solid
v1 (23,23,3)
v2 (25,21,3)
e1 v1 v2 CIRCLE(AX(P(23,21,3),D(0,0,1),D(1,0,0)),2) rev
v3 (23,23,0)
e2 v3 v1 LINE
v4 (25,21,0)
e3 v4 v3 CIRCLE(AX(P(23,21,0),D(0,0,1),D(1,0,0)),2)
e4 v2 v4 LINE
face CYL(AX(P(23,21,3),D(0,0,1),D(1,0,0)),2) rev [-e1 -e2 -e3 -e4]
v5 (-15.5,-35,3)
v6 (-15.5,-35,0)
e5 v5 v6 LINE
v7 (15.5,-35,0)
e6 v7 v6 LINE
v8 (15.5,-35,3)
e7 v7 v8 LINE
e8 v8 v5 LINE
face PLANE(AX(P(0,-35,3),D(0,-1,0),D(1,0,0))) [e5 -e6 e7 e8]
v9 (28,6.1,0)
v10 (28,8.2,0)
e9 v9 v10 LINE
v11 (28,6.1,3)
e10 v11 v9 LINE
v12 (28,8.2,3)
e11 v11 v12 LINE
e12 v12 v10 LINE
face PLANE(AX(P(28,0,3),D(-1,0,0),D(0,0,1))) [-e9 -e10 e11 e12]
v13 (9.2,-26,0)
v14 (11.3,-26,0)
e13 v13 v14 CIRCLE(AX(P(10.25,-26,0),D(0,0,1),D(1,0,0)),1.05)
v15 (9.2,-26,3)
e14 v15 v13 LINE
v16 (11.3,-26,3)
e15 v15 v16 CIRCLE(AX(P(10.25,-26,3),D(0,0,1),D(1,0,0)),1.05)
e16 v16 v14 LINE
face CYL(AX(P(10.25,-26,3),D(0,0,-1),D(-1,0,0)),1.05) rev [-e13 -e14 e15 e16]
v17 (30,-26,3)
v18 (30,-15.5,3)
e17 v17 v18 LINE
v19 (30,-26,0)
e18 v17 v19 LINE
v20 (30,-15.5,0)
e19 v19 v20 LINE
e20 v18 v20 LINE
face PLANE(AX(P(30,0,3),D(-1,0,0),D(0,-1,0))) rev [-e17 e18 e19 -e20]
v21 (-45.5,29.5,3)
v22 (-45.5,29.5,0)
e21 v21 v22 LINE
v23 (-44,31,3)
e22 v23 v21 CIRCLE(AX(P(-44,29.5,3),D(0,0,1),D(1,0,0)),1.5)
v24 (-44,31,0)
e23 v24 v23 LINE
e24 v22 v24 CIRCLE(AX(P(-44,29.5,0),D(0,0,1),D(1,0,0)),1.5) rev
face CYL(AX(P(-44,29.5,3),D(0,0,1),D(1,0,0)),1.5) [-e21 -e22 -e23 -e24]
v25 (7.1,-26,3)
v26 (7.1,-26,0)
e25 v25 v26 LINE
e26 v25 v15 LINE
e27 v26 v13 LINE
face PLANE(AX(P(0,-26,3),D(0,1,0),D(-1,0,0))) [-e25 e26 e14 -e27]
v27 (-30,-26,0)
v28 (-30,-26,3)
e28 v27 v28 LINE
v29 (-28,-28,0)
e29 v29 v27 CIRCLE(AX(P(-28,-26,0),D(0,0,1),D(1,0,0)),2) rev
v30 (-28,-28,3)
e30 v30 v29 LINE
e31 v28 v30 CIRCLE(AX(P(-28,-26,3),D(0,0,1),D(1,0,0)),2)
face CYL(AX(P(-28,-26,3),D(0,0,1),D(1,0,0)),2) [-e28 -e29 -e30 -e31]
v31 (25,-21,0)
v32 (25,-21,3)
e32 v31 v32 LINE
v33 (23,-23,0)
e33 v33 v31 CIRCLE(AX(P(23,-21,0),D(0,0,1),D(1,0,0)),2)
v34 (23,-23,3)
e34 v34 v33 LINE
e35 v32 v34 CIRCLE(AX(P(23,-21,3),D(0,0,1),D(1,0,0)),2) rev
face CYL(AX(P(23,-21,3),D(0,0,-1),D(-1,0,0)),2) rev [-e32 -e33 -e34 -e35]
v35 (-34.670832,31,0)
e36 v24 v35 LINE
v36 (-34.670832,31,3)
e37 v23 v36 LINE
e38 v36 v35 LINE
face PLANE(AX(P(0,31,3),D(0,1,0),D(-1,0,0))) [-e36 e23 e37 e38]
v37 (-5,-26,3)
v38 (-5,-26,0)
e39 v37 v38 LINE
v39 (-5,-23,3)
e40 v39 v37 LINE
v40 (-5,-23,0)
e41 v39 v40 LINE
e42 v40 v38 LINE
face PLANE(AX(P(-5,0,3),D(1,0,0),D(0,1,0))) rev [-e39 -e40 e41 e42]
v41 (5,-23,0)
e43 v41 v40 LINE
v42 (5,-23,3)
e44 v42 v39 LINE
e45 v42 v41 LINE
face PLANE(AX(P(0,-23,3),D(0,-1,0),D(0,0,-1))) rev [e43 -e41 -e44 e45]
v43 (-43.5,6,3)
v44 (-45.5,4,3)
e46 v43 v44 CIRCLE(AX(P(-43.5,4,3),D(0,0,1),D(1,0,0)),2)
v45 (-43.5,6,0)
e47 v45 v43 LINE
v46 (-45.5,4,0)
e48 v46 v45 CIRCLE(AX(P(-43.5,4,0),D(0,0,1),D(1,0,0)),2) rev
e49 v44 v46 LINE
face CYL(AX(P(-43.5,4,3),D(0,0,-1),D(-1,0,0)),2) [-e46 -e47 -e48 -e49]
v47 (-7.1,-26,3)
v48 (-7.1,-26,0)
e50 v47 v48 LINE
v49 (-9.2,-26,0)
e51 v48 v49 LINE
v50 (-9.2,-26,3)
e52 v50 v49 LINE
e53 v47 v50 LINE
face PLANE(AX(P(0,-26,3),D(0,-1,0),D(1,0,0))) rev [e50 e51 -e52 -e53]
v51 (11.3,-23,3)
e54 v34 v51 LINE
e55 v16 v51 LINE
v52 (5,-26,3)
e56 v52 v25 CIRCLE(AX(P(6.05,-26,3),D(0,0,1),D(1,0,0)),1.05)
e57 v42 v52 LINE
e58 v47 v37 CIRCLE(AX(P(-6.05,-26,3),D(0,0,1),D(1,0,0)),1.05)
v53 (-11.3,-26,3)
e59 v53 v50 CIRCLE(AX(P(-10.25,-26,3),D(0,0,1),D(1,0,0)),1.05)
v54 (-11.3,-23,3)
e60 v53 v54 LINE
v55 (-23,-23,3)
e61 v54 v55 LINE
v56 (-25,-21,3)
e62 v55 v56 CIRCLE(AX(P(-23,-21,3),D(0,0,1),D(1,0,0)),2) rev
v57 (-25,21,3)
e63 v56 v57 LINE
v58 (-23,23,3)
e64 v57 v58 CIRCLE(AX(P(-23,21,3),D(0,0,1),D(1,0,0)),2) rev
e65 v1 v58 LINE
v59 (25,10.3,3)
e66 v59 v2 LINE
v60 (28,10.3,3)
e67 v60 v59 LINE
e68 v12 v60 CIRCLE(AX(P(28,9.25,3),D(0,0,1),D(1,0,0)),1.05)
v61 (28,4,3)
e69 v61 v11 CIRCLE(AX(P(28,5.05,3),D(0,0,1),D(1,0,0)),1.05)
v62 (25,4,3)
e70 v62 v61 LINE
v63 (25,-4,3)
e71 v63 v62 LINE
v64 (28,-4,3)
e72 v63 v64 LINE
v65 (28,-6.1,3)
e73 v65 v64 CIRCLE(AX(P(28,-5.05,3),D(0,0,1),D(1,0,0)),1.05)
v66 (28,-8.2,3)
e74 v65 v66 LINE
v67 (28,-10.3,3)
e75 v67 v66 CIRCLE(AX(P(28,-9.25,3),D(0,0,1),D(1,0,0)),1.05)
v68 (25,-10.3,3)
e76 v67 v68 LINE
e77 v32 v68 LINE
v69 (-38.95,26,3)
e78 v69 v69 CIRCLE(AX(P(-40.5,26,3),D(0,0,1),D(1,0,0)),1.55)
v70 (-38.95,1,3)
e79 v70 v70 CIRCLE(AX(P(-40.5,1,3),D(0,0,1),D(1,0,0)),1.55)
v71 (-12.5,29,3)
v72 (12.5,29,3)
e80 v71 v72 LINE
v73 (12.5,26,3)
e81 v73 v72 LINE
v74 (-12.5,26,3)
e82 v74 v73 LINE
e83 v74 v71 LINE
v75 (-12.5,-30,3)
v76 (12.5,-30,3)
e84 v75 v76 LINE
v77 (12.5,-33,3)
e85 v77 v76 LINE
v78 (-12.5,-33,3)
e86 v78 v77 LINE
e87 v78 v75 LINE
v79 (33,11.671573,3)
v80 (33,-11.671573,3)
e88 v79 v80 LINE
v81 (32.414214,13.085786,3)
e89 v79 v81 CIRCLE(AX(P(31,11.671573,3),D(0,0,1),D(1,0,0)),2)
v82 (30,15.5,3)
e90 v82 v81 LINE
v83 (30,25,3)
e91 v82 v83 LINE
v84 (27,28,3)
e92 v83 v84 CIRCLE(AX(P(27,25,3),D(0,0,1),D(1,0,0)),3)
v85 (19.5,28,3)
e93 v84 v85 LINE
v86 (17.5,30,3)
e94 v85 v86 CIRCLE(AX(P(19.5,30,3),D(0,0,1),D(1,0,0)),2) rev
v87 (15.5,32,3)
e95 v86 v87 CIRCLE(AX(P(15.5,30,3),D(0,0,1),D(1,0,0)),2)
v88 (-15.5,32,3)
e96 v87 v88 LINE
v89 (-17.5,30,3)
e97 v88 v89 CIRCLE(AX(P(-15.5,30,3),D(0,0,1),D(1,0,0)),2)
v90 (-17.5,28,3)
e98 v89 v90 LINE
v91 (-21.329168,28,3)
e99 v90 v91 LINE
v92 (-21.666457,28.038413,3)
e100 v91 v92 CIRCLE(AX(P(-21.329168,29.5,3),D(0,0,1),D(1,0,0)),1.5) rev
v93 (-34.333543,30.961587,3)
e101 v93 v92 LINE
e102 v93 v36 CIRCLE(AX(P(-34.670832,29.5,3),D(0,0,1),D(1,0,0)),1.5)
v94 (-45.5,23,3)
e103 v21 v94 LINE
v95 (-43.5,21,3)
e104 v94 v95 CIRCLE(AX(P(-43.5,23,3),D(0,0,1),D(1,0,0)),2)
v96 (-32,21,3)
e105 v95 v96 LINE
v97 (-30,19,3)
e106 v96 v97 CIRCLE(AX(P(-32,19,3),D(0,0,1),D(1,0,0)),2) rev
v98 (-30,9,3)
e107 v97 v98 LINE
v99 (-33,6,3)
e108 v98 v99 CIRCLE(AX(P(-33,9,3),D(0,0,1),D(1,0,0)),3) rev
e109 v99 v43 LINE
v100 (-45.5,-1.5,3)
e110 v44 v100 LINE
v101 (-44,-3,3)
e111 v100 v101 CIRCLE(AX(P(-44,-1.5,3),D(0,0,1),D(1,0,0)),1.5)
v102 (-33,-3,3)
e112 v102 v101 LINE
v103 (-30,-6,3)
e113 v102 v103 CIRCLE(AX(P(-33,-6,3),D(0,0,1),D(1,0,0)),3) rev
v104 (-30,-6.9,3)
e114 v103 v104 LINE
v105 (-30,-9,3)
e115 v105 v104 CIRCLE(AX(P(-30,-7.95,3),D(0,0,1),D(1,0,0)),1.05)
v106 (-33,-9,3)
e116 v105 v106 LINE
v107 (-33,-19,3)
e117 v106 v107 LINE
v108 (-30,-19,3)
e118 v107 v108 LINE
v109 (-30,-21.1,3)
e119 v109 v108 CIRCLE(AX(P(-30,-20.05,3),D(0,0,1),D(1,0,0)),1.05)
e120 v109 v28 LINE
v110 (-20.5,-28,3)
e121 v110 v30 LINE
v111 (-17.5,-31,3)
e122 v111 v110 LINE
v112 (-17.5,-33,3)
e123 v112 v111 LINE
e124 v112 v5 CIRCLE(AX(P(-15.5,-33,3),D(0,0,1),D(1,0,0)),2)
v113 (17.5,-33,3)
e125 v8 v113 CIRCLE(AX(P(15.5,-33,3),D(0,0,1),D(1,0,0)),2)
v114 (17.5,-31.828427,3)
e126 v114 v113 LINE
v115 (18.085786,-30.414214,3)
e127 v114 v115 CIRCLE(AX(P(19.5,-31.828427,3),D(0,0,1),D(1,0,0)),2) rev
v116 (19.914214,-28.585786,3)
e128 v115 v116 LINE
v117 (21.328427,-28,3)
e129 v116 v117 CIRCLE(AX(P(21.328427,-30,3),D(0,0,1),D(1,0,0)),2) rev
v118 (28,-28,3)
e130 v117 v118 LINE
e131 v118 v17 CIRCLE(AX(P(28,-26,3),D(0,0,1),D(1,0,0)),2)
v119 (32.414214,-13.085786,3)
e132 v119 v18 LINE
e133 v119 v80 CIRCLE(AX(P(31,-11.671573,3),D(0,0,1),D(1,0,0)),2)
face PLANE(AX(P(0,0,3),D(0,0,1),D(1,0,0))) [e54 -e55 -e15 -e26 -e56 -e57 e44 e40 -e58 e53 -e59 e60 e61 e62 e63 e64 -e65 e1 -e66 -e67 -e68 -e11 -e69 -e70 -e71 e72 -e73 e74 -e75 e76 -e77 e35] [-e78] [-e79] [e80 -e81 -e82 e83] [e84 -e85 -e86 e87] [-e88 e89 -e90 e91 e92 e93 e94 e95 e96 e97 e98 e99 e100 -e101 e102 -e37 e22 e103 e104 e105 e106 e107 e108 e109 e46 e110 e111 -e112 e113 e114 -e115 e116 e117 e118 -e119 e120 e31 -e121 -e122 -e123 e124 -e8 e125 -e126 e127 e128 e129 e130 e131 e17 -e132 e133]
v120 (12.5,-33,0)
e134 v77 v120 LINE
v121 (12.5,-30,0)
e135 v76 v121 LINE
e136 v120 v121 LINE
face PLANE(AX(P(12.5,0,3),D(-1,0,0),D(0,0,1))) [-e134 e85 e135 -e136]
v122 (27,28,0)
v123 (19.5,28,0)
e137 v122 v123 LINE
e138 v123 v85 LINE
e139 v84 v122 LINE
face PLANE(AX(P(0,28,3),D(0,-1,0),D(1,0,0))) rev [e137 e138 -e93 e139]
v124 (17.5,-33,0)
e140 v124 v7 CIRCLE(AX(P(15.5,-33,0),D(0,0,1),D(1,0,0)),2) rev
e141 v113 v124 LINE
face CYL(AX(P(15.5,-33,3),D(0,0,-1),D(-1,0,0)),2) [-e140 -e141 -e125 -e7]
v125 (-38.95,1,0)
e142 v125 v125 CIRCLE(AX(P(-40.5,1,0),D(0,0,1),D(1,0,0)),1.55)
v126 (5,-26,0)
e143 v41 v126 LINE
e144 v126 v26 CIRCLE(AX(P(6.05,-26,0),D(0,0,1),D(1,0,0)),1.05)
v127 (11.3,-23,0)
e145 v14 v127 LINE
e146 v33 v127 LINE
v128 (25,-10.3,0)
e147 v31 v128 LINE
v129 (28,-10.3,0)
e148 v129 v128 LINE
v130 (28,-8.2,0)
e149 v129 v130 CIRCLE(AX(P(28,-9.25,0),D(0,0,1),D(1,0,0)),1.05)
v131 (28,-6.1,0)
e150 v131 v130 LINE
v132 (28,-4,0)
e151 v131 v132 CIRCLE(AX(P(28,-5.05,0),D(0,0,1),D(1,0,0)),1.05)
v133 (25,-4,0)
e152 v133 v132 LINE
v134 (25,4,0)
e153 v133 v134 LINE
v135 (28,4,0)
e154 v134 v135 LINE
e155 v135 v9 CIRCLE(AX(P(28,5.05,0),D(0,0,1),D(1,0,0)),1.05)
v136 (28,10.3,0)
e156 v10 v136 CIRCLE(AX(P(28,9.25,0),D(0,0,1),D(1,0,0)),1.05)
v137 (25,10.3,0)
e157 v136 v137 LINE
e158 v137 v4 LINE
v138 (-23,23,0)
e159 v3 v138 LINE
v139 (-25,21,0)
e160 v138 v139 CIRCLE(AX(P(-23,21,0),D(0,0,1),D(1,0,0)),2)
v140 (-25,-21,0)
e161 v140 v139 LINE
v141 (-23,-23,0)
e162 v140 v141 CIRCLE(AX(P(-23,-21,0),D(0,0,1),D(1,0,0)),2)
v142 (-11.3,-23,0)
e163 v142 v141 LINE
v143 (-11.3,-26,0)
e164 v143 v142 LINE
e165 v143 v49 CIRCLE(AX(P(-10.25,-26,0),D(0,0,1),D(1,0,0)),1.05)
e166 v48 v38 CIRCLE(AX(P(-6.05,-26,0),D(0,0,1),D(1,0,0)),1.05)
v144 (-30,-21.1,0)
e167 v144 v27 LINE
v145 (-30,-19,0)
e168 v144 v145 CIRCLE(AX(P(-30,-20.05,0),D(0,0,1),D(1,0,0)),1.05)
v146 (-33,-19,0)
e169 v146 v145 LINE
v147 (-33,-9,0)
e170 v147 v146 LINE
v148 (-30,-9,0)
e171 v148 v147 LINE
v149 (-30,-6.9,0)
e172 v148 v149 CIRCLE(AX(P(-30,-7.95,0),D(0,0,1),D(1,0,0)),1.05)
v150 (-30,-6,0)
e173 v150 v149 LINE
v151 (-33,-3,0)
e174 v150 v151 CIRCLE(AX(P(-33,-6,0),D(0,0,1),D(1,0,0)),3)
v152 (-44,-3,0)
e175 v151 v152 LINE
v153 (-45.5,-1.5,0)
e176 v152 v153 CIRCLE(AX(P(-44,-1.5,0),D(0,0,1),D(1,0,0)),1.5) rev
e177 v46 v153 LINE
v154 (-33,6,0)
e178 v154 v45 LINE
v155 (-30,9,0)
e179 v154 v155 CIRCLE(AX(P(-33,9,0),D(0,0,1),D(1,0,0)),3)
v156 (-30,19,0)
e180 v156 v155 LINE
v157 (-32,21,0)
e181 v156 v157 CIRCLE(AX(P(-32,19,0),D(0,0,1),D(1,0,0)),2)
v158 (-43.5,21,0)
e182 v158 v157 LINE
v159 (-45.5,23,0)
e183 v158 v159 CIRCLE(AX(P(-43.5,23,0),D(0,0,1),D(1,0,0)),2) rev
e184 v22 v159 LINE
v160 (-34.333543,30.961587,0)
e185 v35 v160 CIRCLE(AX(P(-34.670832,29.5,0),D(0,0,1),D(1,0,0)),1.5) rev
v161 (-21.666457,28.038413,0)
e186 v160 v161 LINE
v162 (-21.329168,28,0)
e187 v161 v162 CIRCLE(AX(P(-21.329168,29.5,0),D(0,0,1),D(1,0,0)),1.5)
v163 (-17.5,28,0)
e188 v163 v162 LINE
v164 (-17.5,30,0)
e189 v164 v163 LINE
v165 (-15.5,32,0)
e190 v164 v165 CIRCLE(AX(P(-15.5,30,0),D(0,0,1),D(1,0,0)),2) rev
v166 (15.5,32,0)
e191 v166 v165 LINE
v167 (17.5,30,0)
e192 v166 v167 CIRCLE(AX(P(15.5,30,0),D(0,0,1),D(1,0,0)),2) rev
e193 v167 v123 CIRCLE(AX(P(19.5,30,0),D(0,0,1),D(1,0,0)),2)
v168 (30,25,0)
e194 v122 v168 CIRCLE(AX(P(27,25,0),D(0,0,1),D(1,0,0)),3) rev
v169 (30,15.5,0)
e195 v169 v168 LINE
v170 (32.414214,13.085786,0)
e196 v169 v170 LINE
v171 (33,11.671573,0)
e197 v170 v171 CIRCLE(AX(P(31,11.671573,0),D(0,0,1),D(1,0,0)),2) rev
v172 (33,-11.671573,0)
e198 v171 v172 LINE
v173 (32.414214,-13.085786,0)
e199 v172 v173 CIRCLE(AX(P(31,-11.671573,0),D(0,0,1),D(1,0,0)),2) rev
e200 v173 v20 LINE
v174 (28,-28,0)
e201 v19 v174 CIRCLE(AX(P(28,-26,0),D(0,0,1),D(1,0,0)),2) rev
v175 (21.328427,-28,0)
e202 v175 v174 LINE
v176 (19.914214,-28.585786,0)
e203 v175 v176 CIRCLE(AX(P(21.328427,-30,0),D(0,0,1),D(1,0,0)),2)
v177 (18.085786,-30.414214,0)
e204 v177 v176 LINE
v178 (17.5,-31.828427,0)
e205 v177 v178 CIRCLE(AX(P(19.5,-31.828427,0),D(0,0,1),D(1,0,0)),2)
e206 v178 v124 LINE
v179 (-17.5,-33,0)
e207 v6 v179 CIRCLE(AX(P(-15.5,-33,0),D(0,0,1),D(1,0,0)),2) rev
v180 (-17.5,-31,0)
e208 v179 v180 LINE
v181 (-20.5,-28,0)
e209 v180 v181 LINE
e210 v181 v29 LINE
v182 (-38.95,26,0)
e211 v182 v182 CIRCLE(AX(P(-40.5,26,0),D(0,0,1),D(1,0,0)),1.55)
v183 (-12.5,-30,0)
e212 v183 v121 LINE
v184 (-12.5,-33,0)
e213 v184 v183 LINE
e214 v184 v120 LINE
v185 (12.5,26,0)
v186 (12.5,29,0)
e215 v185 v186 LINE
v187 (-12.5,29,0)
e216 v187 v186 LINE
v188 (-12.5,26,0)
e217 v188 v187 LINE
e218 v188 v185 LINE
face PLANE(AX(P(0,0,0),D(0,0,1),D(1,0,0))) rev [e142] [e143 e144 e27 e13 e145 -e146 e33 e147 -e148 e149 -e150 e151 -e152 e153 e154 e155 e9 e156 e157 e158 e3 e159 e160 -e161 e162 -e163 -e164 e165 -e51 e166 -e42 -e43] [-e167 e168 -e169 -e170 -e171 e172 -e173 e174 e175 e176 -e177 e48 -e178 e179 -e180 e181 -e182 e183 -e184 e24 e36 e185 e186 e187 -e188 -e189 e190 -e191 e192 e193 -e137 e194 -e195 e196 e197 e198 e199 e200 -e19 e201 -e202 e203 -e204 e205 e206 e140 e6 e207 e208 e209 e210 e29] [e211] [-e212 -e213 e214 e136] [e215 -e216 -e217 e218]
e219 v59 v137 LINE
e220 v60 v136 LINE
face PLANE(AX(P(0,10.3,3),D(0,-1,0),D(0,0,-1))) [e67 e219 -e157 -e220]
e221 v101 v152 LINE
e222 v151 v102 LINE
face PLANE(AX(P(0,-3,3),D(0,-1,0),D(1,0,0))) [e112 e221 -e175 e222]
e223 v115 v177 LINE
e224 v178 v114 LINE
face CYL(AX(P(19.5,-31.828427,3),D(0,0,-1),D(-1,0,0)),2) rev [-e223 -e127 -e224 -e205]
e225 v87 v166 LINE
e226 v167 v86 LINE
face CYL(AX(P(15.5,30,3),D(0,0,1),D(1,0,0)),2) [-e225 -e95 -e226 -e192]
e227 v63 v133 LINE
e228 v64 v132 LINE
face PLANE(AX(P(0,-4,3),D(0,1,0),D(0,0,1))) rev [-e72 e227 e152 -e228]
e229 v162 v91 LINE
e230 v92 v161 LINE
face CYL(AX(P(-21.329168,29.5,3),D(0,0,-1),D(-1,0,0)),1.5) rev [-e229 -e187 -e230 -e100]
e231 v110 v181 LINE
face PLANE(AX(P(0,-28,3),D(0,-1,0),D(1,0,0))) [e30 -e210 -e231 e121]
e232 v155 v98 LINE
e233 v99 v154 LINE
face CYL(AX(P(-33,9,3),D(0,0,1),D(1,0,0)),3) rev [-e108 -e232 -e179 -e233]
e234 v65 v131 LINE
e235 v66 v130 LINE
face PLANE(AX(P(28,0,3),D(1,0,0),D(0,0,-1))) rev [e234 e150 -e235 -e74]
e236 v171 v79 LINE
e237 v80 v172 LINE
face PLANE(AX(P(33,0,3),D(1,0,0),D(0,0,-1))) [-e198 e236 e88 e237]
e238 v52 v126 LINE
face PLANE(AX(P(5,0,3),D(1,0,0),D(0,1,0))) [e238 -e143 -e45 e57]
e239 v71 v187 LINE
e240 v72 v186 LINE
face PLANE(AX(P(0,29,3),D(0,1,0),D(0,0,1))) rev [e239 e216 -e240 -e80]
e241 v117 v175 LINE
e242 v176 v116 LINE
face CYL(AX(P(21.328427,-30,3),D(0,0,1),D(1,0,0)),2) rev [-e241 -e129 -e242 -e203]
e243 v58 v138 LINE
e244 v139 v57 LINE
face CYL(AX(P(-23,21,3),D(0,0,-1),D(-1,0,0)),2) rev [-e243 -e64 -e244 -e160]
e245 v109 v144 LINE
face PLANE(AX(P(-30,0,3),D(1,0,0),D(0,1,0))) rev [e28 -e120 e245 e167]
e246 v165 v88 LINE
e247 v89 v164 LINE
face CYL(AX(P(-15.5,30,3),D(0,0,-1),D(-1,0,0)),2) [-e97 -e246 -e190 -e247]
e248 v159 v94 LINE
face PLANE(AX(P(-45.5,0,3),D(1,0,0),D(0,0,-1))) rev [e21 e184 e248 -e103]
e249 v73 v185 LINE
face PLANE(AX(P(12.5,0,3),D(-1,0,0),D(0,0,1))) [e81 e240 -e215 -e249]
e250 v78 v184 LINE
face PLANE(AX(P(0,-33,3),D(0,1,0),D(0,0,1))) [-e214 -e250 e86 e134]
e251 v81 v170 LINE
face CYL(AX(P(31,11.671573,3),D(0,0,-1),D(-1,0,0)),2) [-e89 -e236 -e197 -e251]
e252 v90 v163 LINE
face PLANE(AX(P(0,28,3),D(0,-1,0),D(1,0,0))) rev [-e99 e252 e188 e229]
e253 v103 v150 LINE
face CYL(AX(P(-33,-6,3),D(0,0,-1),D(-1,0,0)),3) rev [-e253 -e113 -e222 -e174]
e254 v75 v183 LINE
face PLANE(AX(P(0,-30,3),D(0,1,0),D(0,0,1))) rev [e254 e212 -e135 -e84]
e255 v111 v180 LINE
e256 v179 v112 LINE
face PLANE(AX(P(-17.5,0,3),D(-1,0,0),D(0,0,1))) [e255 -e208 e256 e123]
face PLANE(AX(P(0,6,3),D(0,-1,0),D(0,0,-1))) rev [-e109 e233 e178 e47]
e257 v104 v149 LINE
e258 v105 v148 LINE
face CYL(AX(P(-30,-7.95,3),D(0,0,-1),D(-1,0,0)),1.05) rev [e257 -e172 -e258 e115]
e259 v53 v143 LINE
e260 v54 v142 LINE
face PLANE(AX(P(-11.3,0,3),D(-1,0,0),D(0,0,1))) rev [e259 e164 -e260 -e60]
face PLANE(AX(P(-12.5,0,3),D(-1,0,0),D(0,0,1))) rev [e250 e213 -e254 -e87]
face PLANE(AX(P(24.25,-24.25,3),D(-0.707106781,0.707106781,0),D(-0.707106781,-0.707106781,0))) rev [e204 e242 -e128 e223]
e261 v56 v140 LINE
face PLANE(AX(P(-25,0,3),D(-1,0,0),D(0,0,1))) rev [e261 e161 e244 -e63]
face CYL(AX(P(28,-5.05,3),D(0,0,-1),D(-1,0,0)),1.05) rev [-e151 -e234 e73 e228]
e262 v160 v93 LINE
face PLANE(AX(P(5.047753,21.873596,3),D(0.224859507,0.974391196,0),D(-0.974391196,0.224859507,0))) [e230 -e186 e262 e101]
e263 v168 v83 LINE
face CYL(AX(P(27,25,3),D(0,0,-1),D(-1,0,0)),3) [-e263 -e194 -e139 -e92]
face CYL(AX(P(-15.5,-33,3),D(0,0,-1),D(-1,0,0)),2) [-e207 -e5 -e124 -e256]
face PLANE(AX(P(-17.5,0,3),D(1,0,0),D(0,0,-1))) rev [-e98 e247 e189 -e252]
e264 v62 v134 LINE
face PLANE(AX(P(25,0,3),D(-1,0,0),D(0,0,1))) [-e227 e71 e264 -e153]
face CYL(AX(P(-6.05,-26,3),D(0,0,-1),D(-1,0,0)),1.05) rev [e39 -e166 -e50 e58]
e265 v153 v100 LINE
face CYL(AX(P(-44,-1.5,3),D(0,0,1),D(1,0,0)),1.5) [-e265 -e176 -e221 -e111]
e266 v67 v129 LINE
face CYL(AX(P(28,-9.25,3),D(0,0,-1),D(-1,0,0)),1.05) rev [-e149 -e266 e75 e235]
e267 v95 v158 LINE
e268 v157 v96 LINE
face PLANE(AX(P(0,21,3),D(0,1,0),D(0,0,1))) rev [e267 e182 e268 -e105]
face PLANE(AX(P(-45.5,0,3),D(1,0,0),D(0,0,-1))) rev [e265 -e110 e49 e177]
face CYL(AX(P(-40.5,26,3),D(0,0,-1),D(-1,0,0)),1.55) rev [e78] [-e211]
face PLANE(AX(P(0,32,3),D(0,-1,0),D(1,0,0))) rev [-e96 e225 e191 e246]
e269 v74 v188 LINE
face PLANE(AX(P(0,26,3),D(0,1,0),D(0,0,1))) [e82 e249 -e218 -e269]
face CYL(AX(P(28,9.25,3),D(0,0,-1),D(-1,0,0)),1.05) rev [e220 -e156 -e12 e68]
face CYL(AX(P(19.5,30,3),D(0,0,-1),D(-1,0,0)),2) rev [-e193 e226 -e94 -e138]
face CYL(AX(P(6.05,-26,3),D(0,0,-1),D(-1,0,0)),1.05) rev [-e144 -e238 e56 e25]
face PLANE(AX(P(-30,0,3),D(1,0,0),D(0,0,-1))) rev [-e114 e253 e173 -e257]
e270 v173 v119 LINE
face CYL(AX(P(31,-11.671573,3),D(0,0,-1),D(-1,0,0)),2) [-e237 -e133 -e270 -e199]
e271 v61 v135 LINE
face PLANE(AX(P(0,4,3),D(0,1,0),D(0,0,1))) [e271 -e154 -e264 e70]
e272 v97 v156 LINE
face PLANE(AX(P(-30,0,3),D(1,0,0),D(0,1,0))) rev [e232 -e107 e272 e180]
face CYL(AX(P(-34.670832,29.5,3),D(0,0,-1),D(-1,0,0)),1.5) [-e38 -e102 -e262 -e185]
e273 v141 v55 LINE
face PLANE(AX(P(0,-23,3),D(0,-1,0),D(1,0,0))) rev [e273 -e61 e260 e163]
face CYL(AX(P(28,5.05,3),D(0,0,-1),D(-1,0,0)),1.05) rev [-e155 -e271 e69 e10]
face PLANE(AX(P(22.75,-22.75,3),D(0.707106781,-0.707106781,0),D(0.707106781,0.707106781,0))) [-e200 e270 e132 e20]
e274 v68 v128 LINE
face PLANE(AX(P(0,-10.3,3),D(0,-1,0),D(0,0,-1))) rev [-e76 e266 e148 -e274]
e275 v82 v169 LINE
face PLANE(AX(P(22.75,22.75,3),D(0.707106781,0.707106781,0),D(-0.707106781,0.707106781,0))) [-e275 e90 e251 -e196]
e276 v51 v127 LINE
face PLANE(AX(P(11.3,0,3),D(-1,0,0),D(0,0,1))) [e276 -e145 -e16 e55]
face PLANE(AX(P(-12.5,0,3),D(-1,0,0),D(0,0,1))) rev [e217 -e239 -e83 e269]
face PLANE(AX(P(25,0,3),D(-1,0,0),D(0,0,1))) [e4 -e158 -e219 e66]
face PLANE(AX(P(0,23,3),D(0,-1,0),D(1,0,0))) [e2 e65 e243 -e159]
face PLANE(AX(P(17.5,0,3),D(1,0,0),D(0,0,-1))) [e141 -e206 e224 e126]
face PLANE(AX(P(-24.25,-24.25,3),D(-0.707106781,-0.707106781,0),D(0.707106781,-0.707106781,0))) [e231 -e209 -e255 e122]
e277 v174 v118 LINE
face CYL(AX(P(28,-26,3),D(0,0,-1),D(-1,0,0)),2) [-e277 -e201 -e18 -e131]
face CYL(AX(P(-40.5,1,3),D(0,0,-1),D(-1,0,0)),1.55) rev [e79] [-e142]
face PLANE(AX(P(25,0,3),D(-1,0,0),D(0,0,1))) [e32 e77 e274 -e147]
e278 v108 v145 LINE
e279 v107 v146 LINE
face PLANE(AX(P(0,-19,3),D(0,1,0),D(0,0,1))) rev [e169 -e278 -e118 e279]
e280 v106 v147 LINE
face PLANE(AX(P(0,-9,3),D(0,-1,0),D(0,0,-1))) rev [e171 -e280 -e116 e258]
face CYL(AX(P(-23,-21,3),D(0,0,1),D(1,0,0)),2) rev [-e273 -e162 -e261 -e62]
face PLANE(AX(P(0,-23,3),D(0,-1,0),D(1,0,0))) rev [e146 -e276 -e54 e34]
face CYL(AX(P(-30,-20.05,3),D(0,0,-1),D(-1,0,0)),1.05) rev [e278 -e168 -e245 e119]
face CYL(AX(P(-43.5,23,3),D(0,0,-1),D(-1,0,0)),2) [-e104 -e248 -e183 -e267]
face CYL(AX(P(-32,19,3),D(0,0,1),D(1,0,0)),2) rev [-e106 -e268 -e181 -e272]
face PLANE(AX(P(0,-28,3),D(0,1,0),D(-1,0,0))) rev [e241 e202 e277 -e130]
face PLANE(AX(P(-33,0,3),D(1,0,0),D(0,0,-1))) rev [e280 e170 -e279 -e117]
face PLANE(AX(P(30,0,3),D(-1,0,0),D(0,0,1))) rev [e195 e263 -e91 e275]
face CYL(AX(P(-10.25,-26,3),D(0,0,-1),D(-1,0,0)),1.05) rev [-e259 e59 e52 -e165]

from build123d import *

# Parameters (mm, degrees)
SKETCH_1_W      = 25
SKETCH_1_H      = 3
SKETCH_1_R      = 1.55
EXTRUDE_1_DEPTH = 3
FILLET_2_R      = 3
FILLET_4_R      = 2
FILLET_5_R      = 1.5
FILLET_6_R      = 3
FILLET_1_R      = 2


with BuildPart() as part:
    # 草图1 → 凸台-拉伸1 (new body)
    with BuildSketch(Plane.XY):
        with BuildLine():
            Line((-34.5, 31), (-45.5, 31))
            Line((-45.5, 31), (-45.5, 21))
            Line((-45.5, 21), (-30, 21))
            Line((-30, 21), (-30, 6))
            Line((-30, 6), (-45.5, 6))
            Line((-45.5, 6), (-45.5, -3))
            Line((-45.5, -3), (-30, -3))
            Line((-30, -3), (-30, -6.9))
            ThreePointArc((-30, -6.9), (-28.95, -7.95), (-30, -9))
            Line((-30, -9), (-33, -9))
            Line((-33, -9), (-33, -19))
            Line((-33, -19), (-30, -19))
            ThreePointArc((-30, -19), (-28.95, -20.05), (-30, -21.1))
            Line((-30, -21.1), (-30, -28))
            Line((-30, -28), (-20.5, -28))
            Line((-20.5, -28), (-17.5, -31))
            Line((-17.5, -31), (-17.5, -35))
            Line((-17.5, -35), (17.5, -35))
            Line((17.5, -35), (17.5, -31))
            Line((17.5, -31), (20.5, -28))
            Line((20.5, -28), (30, -28))
            Line((30, -28), (30, -15.5))
            Line((30, -15.5), (33, -12.5))
            Line((33, -12.5), (33, 12.5))
            Line((33, 12.5), (30, 15.5))
            Line((30, 15.5), (30, 28))
            Line((30, 28), (17.5, 28))
            Line((17.5, 28), (17.5, 32))
            Line((17.5, 32), (-17.5, 32))
            Line((-17.5, 32), (-17.5, 28))
            Line((-17.5, 28), (-21.5, 28))
            Line((-21.5, 28), (-34.5, 31))
        make_face()
        with Locations((0, -31.5)):
            Rectangle(SKETCH_1_W, SKETCH_1_H, mode=Mode.SUBTRACT)
        with BuildLine():
            Line((25, -10.3), (25, -23))
            Line((25, -23), (11.3, -23))
            Line((11.3, -23), (11.3, -26))
            ThreePointArc((11.3, -26), (10.25, -27.05), (9.2, -26))
            Line((9.2, -26), (7.1, -26))
            ThreePointArc((7.1, -26), (6.05, -27.05), (5, -26))
            Line((5, -26), (5, -23))
            Line((5, -23), (-5, -23))
            Line((-5, -23), (-5, -26))
            ThreePointArc((-5, -26), (-6.05, -27.05), (-7.1, -26))
            Line((-7.1, -26), (-9.2, -26))
            ThreePointArc((-9.2, -26), (-10.25, -27.05), (-11.3, -26))
            Line((-11.3, -26), (-11.3, -23))
            Line((-11.3, -23), (-25, -23))
            Line((-25, -23), (-25, 23))
            Line((-25, 23), (25, 23))
            Line((25, 23), (25, 10.3))
            Line((25, 10.3), (28, 10.3))
            ThreePointArc((28, 10.3), (29.05, 9.25), (28, 8.2))
            Line((28, 8.2), (28, 6.1))
            ThreePointArc((28, 6.1), (29.05, 5.05), (28, 4))
            Line((28, 4), (25, 4))
            Line((25, 4), (25, -4))
            Line((25, -4), (28, -4))
            ThreePointArc((28, -4), (29.05, -5.05), (28, -6.1))
            Line((28, -6.1), (28, -8.2))
            ThreePointArc((28, -8.2), (29.05, -9.25), (28, -10.3))
            Line((28, -10.3), (25, -10.3))
        make_face(mode=Mode.SUBTRACT)
        with Locations((-40.5, 1)):
            Circle(SKETCH_1_R, mode=Mode.SUBTRACT)
        with Locations((-40.5, 26)):
            Circle(SKETCH_1_R, mode=Mode.SUBTRACT)
        with Locations((0, 27.5)):
            Rectangle(SKETCH_1_W, SKETCH_1_H, mode=Mode.SUBTRACT)
    extrude(amount=EXTRUDE_1_DEPTH)

    # 圆角2
    fillet_2_edges = [part.edges().sort_by_distance(p)[0] for p in [
        (30, 28, 1.5),
    ]]
    fillet(fillet_2_edges, radius=FILLET_2_R)

    # 圆角4
    fillet_4_edges = [part.edges().sort_by_distance(p)[0] for p in [
        (-30, 21, 1.5),
    ]]
    fillet(fillet_4_edges, radius=FILLET_4_R)

    # 圆角5
    fillet_5_edges = [part.edges().sort_by_distance(p)[0] for p in [
        (-45.5, -3, 1.5),
        (-45.5, 31, 1.5),
        (-34.5, 31, 1.5),
        (-21.5, 28, 1.5),
    ]]
    fillet(fillet_5_edges, radius=FILLET_5_R)

    # 圆角6
    fillet_6_edges = [part.edges().sort_by_distance(p)[0] for p in [
        (-30, -3, 1.5),
        (-30, 6, 1.5),
    ]]
    fillet(fillet_6_edges, radius=FILLET_6_R)

    # 圆角1
    fillet_1_edges = [part.edges().sort_by_distance(p)[0] for p in [
        (25, 23, 1.5),
        (-25, 23, 1.5),
        (-25, -23, 1.5),
        (25, -23, 1.5),
        (-45.5, 6, 1.5),
        (-45.5, 21, 1.5),
        (-17.5, 32, 1.5),
        (17.5, 32, 1.5),
        (17.5, 28, 1.5),
        (33, 12.5, 1.5),
        (33, -12.5, 1.5),
        (30, -28, 1.5),
        (20.5, -28, 1.5),
        (17.5, -31, 1.5),
        (17.5, -35, 1.5),
        (-17.5, -35, 1.5),
        (-30, -28, 1.5),
    ]]
    fillet(fillet_1_edges, radius=FILLET_1_R - 0.0001)  # a hair under: the kernel refuses the full size


solid = part.part
